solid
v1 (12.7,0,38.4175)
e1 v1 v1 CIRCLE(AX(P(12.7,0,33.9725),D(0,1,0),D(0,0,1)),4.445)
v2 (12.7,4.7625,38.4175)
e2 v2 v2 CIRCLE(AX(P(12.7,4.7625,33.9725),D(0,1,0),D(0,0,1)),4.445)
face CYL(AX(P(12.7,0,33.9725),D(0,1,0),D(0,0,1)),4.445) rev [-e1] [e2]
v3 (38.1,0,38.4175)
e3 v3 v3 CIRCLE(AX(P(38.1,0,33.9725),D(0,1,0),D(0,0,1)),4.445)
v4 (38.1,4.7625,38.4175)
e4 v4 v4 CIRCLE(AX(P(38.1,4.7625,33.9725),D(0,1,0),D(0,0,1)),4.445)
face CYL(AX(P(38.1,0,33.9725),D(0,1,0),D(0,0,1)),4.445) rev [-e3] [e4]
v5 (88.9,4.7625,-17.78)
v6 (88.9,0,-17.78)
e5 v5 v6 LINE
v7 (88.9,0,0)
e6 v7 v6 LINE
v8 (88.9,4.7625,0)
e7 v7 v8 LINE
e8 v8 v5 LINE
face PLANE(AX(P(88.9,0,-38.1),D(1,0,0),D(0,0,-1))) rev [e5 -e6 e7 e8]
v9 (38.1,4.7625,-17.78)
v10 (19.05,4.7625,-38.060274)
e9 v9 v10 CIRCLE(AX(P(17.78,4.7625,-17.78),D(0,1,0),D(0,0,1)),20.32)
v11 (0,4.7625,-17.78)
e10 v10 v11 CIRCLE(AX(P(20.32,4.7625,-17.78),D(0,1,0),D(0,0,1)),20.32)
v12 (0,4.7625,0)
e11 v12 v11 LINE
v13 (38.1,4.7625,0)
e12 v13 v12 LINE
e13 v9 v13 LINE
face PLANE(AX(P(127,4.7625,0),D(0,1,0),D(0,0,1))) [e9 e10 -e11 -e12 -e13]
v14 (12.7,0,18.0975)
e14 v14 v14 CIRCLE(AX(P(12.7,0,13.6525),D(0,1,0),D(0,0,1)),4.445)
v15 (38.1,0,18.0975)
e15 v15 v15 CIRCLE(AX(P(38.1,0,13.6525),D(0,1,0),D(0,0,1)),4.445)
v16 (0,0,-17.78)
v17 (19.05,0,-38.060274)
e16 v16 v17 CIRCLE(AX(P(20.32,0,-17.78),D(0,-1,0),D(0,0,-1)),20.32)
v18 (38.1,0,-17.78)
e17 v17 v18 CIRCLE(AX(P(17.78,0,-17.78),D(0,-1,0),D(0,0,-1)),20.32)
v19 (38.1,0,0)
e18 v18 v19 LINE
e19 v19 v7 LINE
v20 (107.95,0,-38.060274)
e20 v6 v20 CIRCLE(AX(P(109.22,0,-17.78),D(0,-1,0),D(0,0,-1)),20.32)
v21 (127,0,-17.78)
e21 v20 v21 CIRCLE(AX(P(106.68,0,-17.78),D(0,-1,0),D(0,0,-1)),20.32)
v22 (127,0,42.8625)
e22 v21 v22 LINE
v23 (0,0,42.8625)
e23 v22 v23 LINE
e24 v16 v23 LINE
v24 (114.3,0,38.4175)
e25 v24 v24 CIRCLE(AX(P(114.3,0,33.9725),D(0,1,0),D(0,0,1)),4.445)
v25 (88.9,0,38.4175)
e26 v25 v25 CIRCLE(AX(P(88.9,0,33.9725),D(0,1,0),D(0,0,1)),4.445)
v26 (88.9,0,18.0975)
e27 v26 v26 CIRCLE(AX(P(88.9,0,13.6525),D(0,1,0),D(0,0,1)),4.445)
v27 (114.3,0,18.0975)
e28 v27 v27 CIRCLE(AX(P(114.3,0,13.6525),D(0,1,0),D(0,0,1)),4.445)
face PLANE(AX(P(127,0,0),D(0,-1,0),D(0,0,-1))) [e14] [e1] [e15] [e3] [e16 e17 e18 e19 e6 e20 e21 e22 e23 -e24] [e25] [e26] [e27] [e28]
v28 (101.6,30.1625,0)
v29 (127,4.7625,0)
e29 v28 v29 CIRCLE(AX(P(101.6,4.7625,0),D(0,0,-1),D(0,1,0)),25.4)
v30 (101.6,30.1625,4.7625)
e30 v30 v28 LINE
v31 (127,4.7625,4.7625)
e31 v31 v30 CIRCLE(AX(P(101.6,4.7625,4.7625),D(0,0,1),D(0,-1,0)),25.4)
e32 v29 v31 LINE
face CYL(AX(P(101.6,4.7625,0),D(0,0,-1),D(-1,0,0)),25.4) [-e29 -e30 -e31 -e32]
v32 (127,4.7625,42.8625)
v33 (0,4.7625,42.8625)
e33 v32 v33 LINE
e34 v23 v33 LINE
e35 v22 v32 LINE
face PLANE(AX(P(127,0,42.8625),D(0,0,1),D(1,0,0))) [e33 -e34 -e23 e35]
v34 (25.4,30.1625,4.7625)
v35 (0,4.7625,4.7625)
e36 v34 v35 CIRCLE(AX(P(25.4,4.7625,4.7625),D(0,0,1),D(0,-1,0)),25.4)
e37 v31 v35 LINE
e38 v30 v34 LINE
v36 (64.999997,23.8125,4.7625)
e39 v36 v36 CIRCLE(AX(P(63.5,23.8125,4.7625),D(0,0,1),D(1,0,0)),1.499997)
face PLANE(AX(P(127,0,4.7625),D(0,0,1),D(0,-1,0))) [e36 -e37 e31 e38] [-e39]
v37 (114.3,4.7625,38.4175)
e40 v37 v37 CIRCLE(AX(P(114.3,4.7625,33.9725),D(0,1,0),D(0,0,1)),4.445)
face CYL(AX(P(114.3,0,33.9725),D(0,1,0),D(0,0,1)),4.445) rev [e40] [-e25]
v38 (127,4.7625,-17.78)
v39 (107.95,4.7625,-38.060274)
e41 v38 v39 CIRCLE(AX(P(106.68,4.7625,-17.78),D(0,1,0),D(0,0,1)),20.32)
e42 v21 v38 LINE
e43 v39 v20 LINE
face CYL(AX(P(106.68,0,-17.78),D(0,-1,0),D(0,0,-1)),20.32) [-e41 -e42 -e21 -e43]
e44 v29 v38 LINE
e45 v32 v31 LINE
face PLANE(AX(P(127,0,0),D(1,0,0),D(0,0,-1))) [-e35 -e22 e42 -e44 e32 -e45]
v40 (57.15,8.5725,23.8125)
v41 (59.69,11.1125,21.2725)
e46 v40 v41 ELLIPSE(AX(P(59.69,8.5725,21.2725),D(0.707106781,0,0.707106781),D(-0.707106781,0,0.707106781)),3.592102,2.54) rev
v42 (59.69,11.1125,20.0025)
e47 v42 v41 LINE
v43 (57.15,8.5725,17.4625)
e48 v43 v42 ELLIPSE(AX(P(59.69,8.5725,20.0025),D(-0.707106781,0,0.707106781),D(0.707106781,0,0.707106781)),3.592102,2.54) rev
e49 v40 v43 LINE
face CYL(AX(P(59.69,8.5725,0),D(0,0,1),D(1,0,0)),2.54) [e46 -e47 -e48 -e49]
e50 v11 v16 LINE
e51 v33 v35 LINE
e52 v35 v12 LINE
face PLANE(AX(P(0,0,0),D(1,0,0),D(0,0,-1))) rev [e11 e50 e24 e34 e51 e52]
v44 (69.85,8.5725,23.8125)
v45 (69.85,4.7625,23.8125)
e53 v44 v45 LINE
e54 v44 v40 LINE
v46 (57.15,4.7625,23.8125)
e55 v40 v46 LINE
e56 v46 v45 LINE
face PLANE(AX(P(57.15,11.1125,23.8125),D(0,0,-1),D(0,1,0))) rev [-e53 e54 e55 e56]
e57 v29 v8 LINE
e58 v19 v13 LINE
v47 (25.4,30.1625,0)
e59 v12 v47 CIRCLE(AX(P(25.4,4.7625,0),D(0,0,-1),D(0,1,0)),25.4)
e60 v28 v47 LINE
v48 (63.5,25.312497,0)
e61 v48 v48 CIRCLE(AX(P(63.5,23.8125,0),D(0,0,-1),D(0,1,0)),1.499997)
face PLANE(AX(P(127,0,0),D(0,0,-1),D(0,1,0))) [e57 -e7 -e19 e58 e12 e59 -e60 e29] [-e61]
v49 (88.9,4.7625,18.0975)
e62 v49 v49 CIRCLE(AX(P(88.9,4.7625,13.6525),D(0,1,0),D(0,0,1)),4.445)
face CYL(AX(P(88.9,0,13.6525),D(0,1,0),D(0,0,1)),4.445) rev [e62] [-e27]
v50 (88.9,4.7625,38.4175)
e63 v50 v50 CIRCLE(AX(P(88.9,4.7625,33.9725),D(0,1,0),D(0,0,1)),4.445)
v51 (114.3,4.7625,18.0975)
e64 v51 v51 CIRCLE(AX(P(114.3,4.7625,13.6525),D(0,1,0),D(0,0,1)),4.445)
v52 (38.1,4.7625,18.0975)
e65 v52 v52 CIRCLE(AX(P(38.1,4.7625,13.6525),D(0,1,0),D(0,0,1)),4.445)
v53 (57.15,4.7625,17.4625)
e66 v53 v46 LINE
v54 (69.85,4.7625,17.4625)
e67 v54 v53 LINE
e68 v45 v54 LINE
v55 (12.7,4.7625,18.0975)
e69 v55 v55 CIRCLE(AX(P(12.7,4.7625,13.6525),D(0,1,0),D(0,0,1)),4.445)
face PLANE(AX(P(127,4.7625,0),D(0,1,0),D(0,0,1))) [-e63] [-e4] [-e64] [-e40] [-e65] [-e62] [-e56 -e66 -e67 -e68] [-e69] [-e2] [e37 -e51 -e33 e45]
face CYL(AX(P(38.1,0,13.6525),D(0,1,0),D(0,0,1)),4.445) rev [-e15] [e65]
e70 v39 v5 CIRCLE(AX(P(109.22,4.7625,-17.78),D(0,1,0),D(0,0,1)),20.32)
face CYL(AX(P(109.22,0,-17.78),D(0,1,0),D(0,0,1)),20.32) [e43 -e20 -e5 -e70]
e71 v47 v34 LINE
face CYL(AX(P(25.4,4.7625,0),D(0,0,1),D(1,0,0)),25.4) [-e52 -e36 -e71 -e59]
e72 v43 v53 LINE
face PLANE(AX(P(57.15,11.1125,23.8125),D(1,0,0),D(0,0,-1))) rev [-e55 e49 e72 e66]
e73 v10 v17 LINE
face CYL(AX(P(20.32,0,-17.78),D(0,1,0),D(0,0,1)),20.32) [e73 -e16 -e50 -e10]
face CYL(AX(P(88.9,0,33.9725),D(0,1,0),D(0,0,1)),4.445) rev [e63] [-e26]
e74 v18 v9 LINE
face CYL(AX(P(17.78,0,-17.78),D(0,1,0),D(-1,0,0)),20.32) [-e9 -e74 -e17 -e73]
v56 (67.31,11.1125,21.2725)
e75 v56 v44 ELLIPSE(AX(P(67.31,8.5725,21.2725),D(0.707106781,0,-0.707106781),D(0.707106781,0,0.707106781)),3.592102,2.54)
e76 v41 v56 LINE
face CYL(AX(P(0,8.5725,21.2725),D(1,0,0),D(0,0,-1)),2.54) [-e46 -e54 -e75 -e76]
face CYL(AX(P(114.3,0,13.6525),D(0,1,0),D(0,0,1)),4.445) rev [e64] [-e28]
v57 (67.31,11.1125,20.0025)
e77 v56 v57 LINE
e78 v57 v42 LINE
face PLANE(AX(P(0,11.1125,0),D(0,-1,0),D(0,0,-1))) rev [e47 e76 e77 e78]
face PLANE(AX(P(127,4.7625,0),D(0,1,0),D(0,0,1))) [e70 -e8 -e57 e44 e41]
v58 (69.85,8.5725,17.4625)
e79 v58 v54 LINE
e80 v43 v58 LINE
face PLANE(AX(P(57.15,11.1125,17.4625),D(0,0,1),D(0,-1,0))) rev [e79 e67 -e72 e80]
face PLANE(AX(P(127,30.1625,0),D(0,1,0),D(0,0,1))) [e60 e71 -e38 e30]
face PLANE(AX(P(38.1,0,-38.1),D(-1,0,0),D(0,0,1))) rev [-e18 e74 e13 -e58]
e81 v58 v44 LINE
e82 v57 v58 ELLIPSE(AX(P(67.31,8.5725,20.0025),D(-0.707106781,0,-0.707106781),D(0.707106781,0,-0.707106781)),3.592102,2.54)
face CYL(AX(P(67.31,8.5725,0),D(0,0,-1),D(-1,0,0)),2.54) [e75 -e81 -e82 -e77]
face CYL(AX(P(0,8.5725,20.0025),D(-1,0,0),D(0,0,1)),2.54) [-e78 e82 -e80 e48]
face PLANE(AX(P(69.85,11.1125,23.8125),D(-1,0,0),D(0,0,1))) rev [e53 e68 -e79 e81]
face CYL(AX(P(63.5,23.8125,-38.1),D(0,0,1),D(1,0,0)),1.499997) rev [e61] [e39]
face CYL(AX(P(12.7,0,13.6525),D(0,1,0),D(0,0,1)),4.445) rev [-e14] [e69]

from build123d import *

# Parameters (mm, degrees)
SKETCH1_W           = 38.1
SKETCH1_H           = 4.7625
BOSS_EXTRUDE1_DEPTH = 127
SKETCH2_W           = 12.7
SKETCH2_H           = 6.35
BOSS_EXTRUDE2_DEPTH = 6.35
SKETCH3_R           = 1.499997
CUT_EXTRUDE1_DEPTH  = 138.389847924
FILLET1_R           = 2.54
SKETCH4_W           = 50.8
SKETCH4_H           = 38.1
CUT_EXTRUDE2_DEPTH  = 137.423436059
FILLET2_R           = 20.32
SKETCH5_R           = 4.445
CUT_EXTRUDE3_DEPTH  = 137.423436059
FILLET3_R           = 25.4


with BuildPart() as part:
    # Sketch1 → Boss-Extrude1 (new body)
    with BuildSketch(Plane(origin=(0, 0, 0), x_dir=(0, 0, -1), z_dir=(1, 0, 0))):
        Polygon((0, 30.1625), (0, 0), (-42.8625, 0), (-42.8625, 4.7625), (-4.7625, 4.7625), (-4.7625, 30.1625), align=None)
        with Locations((19.05, 2.38125)):
            Rectangle(SKETCH1_W, SKETCH1_H)
    extrude(amount=BOSS_EXTRUDE1_DEPTH)

    # Sketch2 → Boss-Extrude2 (add)
    with BuildSketch(Plane(origin=(0, 4.7625, 0), x_dir=(1, 0, 0), z_dir=(0, 1, 0))):
        with Locations((63.5, -20.6375)):
            Rectangle(SKETCH2_W, SKETCH2_H)
    extrude(amount=BOSS_EXTRUDE2_DEPTH)

    # Sketch3 → Cut-Extrude1 (cut, through all)
    with BuildSketch(Plane.XY.offset(4.7625)):
        with Locations((63.5, 23.8125)):
            Circle(SKETCH3_R)
    extrude(amount=-CUT_EXTRUDE1_DEPTH, mode=Mode.SUBTRACT)

    # Fillet1
    fillet1_edges = [part.edges().sort_by_distance(p)[0] for p in [
        (57.15, 11.1125, 20.6375),
        (63.5, 11.1125, 23.8125),
        (69.85, 11.1125, 20.6375),
        (63.5, 11.1125, 17.4625),
    ]]
    fillet(fillet1_edges, radius=FILLET1_R)

    # Sketch4 → Cut-Extrude2 (cut, through all)
    with BuildSketch(Plane(origin=(0, 4.7625, 0), x_dir=(1, 0, 0), z_dir=(0, 1, 0))):
        with Locations((63.5, 19.05)):
            Rectangle(SKETCH4_W, SKETCH4_H)
    extrude(amount=-CUT_EXTRUDE2_DEPTH, mode=Mode.SUBTRACT)

    # Fillet2
    # the kernel refuses this fillet: 20.32 mm, written as the material it takes off along each edge
    with BuildSketch(Plane(origin=(0, -50.8, -38.1), x_dir=(0, 0, 1), z_dir=(0, 1, 0)), Plane(origin=(88.9, 55.5625, -38.1), x_dir=(1, 0, 0), z_dir=(0, -1, 0))) as fillet2_piece_1:
        with BuildLine():
            CenterArc((FILLET2_R, FILLET2_R), FILLET2_R, 180, 90)
            Line((0, FILLET2_R), (0, 0))
            Line((0, 0), (FILLET2_R, 0))
        make_face()
    extrude(amount=106.3625, mode=Mode.SUBTRACT)
    with BuildSketch(Plane(origin=(38.1, 55.5625, -38.1), x_dir=(-1, 0, 0), z_dir=(0, -1, 0)), Plane(origin=(127, -50.8, -38.1), x_dir=(0, 0, 1), z_dir=(0, 1, 0))) as fillet2_piece_2:
        with BuildLine():
            CenterArc((FILLET2_R, -FILLET2_R), FILLET2_R, 90, 90)
            Line((0, -FILLET2_R), (0, 0))
            Line((0, 0), (FILLET2_R, 0))
        make_face()
    extrude(amount=106.3625, mode=Mode.SUBTRACT)

    # Sketch5 → Cut-Extrude3 (cut, through all)
    with BuildSketch(Plane(origin=(0, 4.7625, 0), x_dir=(1, 0, 0), z_dir=(0, 1, 0))):
        with Locations(Location((12.7, -13.6525, 0), (0, 0, 270))):
            Circle(SKETCH5_R)
        with Locations(Location((12.7, -33.9725, 0), (0, 0, 270))):
            Circle(SKETCH5_R)
        with Locations(Location((114.3, -13.6525, 0), (0, 0, 270))):
            Circle(SKETCH5_R)
        with Locations(Location((114.3, -33.9725, 0), (0, 0, 270))):
            Circle(SKETCH5_R)
        with Locations(Location((38.1, -13.6525, 0), (0, 0, 270))):
            Circle(SKETCH5_R)
        with Locations(Location((88.9, -13.6525, 0), (0, 0, 270))):
            Circle(SKETCH5_R)
        with Locations(Location((38.1, -33.9725, 0), (0, 0, 270))):
            Circle(SKETCH5_R)
        with Locations(Location((88.9, -33.9725, 0), (0, 0, 270))):
            Circle(SKETCH5_R)
    extrude(amount=-CUT_EXTRUDE3_DEPTH, mode=Mode.SUBTRACT)

    # Fillet3
    fillet3_edges = [part.edges().sort_by_distance(p)[0] for p in [
        (127, 30.1625, 2.38125),
        (0, 30.1625, 2.38125),
    ]]
    fillet(fillet3_edges, radius=FILLET3_R)


solid = part.part
